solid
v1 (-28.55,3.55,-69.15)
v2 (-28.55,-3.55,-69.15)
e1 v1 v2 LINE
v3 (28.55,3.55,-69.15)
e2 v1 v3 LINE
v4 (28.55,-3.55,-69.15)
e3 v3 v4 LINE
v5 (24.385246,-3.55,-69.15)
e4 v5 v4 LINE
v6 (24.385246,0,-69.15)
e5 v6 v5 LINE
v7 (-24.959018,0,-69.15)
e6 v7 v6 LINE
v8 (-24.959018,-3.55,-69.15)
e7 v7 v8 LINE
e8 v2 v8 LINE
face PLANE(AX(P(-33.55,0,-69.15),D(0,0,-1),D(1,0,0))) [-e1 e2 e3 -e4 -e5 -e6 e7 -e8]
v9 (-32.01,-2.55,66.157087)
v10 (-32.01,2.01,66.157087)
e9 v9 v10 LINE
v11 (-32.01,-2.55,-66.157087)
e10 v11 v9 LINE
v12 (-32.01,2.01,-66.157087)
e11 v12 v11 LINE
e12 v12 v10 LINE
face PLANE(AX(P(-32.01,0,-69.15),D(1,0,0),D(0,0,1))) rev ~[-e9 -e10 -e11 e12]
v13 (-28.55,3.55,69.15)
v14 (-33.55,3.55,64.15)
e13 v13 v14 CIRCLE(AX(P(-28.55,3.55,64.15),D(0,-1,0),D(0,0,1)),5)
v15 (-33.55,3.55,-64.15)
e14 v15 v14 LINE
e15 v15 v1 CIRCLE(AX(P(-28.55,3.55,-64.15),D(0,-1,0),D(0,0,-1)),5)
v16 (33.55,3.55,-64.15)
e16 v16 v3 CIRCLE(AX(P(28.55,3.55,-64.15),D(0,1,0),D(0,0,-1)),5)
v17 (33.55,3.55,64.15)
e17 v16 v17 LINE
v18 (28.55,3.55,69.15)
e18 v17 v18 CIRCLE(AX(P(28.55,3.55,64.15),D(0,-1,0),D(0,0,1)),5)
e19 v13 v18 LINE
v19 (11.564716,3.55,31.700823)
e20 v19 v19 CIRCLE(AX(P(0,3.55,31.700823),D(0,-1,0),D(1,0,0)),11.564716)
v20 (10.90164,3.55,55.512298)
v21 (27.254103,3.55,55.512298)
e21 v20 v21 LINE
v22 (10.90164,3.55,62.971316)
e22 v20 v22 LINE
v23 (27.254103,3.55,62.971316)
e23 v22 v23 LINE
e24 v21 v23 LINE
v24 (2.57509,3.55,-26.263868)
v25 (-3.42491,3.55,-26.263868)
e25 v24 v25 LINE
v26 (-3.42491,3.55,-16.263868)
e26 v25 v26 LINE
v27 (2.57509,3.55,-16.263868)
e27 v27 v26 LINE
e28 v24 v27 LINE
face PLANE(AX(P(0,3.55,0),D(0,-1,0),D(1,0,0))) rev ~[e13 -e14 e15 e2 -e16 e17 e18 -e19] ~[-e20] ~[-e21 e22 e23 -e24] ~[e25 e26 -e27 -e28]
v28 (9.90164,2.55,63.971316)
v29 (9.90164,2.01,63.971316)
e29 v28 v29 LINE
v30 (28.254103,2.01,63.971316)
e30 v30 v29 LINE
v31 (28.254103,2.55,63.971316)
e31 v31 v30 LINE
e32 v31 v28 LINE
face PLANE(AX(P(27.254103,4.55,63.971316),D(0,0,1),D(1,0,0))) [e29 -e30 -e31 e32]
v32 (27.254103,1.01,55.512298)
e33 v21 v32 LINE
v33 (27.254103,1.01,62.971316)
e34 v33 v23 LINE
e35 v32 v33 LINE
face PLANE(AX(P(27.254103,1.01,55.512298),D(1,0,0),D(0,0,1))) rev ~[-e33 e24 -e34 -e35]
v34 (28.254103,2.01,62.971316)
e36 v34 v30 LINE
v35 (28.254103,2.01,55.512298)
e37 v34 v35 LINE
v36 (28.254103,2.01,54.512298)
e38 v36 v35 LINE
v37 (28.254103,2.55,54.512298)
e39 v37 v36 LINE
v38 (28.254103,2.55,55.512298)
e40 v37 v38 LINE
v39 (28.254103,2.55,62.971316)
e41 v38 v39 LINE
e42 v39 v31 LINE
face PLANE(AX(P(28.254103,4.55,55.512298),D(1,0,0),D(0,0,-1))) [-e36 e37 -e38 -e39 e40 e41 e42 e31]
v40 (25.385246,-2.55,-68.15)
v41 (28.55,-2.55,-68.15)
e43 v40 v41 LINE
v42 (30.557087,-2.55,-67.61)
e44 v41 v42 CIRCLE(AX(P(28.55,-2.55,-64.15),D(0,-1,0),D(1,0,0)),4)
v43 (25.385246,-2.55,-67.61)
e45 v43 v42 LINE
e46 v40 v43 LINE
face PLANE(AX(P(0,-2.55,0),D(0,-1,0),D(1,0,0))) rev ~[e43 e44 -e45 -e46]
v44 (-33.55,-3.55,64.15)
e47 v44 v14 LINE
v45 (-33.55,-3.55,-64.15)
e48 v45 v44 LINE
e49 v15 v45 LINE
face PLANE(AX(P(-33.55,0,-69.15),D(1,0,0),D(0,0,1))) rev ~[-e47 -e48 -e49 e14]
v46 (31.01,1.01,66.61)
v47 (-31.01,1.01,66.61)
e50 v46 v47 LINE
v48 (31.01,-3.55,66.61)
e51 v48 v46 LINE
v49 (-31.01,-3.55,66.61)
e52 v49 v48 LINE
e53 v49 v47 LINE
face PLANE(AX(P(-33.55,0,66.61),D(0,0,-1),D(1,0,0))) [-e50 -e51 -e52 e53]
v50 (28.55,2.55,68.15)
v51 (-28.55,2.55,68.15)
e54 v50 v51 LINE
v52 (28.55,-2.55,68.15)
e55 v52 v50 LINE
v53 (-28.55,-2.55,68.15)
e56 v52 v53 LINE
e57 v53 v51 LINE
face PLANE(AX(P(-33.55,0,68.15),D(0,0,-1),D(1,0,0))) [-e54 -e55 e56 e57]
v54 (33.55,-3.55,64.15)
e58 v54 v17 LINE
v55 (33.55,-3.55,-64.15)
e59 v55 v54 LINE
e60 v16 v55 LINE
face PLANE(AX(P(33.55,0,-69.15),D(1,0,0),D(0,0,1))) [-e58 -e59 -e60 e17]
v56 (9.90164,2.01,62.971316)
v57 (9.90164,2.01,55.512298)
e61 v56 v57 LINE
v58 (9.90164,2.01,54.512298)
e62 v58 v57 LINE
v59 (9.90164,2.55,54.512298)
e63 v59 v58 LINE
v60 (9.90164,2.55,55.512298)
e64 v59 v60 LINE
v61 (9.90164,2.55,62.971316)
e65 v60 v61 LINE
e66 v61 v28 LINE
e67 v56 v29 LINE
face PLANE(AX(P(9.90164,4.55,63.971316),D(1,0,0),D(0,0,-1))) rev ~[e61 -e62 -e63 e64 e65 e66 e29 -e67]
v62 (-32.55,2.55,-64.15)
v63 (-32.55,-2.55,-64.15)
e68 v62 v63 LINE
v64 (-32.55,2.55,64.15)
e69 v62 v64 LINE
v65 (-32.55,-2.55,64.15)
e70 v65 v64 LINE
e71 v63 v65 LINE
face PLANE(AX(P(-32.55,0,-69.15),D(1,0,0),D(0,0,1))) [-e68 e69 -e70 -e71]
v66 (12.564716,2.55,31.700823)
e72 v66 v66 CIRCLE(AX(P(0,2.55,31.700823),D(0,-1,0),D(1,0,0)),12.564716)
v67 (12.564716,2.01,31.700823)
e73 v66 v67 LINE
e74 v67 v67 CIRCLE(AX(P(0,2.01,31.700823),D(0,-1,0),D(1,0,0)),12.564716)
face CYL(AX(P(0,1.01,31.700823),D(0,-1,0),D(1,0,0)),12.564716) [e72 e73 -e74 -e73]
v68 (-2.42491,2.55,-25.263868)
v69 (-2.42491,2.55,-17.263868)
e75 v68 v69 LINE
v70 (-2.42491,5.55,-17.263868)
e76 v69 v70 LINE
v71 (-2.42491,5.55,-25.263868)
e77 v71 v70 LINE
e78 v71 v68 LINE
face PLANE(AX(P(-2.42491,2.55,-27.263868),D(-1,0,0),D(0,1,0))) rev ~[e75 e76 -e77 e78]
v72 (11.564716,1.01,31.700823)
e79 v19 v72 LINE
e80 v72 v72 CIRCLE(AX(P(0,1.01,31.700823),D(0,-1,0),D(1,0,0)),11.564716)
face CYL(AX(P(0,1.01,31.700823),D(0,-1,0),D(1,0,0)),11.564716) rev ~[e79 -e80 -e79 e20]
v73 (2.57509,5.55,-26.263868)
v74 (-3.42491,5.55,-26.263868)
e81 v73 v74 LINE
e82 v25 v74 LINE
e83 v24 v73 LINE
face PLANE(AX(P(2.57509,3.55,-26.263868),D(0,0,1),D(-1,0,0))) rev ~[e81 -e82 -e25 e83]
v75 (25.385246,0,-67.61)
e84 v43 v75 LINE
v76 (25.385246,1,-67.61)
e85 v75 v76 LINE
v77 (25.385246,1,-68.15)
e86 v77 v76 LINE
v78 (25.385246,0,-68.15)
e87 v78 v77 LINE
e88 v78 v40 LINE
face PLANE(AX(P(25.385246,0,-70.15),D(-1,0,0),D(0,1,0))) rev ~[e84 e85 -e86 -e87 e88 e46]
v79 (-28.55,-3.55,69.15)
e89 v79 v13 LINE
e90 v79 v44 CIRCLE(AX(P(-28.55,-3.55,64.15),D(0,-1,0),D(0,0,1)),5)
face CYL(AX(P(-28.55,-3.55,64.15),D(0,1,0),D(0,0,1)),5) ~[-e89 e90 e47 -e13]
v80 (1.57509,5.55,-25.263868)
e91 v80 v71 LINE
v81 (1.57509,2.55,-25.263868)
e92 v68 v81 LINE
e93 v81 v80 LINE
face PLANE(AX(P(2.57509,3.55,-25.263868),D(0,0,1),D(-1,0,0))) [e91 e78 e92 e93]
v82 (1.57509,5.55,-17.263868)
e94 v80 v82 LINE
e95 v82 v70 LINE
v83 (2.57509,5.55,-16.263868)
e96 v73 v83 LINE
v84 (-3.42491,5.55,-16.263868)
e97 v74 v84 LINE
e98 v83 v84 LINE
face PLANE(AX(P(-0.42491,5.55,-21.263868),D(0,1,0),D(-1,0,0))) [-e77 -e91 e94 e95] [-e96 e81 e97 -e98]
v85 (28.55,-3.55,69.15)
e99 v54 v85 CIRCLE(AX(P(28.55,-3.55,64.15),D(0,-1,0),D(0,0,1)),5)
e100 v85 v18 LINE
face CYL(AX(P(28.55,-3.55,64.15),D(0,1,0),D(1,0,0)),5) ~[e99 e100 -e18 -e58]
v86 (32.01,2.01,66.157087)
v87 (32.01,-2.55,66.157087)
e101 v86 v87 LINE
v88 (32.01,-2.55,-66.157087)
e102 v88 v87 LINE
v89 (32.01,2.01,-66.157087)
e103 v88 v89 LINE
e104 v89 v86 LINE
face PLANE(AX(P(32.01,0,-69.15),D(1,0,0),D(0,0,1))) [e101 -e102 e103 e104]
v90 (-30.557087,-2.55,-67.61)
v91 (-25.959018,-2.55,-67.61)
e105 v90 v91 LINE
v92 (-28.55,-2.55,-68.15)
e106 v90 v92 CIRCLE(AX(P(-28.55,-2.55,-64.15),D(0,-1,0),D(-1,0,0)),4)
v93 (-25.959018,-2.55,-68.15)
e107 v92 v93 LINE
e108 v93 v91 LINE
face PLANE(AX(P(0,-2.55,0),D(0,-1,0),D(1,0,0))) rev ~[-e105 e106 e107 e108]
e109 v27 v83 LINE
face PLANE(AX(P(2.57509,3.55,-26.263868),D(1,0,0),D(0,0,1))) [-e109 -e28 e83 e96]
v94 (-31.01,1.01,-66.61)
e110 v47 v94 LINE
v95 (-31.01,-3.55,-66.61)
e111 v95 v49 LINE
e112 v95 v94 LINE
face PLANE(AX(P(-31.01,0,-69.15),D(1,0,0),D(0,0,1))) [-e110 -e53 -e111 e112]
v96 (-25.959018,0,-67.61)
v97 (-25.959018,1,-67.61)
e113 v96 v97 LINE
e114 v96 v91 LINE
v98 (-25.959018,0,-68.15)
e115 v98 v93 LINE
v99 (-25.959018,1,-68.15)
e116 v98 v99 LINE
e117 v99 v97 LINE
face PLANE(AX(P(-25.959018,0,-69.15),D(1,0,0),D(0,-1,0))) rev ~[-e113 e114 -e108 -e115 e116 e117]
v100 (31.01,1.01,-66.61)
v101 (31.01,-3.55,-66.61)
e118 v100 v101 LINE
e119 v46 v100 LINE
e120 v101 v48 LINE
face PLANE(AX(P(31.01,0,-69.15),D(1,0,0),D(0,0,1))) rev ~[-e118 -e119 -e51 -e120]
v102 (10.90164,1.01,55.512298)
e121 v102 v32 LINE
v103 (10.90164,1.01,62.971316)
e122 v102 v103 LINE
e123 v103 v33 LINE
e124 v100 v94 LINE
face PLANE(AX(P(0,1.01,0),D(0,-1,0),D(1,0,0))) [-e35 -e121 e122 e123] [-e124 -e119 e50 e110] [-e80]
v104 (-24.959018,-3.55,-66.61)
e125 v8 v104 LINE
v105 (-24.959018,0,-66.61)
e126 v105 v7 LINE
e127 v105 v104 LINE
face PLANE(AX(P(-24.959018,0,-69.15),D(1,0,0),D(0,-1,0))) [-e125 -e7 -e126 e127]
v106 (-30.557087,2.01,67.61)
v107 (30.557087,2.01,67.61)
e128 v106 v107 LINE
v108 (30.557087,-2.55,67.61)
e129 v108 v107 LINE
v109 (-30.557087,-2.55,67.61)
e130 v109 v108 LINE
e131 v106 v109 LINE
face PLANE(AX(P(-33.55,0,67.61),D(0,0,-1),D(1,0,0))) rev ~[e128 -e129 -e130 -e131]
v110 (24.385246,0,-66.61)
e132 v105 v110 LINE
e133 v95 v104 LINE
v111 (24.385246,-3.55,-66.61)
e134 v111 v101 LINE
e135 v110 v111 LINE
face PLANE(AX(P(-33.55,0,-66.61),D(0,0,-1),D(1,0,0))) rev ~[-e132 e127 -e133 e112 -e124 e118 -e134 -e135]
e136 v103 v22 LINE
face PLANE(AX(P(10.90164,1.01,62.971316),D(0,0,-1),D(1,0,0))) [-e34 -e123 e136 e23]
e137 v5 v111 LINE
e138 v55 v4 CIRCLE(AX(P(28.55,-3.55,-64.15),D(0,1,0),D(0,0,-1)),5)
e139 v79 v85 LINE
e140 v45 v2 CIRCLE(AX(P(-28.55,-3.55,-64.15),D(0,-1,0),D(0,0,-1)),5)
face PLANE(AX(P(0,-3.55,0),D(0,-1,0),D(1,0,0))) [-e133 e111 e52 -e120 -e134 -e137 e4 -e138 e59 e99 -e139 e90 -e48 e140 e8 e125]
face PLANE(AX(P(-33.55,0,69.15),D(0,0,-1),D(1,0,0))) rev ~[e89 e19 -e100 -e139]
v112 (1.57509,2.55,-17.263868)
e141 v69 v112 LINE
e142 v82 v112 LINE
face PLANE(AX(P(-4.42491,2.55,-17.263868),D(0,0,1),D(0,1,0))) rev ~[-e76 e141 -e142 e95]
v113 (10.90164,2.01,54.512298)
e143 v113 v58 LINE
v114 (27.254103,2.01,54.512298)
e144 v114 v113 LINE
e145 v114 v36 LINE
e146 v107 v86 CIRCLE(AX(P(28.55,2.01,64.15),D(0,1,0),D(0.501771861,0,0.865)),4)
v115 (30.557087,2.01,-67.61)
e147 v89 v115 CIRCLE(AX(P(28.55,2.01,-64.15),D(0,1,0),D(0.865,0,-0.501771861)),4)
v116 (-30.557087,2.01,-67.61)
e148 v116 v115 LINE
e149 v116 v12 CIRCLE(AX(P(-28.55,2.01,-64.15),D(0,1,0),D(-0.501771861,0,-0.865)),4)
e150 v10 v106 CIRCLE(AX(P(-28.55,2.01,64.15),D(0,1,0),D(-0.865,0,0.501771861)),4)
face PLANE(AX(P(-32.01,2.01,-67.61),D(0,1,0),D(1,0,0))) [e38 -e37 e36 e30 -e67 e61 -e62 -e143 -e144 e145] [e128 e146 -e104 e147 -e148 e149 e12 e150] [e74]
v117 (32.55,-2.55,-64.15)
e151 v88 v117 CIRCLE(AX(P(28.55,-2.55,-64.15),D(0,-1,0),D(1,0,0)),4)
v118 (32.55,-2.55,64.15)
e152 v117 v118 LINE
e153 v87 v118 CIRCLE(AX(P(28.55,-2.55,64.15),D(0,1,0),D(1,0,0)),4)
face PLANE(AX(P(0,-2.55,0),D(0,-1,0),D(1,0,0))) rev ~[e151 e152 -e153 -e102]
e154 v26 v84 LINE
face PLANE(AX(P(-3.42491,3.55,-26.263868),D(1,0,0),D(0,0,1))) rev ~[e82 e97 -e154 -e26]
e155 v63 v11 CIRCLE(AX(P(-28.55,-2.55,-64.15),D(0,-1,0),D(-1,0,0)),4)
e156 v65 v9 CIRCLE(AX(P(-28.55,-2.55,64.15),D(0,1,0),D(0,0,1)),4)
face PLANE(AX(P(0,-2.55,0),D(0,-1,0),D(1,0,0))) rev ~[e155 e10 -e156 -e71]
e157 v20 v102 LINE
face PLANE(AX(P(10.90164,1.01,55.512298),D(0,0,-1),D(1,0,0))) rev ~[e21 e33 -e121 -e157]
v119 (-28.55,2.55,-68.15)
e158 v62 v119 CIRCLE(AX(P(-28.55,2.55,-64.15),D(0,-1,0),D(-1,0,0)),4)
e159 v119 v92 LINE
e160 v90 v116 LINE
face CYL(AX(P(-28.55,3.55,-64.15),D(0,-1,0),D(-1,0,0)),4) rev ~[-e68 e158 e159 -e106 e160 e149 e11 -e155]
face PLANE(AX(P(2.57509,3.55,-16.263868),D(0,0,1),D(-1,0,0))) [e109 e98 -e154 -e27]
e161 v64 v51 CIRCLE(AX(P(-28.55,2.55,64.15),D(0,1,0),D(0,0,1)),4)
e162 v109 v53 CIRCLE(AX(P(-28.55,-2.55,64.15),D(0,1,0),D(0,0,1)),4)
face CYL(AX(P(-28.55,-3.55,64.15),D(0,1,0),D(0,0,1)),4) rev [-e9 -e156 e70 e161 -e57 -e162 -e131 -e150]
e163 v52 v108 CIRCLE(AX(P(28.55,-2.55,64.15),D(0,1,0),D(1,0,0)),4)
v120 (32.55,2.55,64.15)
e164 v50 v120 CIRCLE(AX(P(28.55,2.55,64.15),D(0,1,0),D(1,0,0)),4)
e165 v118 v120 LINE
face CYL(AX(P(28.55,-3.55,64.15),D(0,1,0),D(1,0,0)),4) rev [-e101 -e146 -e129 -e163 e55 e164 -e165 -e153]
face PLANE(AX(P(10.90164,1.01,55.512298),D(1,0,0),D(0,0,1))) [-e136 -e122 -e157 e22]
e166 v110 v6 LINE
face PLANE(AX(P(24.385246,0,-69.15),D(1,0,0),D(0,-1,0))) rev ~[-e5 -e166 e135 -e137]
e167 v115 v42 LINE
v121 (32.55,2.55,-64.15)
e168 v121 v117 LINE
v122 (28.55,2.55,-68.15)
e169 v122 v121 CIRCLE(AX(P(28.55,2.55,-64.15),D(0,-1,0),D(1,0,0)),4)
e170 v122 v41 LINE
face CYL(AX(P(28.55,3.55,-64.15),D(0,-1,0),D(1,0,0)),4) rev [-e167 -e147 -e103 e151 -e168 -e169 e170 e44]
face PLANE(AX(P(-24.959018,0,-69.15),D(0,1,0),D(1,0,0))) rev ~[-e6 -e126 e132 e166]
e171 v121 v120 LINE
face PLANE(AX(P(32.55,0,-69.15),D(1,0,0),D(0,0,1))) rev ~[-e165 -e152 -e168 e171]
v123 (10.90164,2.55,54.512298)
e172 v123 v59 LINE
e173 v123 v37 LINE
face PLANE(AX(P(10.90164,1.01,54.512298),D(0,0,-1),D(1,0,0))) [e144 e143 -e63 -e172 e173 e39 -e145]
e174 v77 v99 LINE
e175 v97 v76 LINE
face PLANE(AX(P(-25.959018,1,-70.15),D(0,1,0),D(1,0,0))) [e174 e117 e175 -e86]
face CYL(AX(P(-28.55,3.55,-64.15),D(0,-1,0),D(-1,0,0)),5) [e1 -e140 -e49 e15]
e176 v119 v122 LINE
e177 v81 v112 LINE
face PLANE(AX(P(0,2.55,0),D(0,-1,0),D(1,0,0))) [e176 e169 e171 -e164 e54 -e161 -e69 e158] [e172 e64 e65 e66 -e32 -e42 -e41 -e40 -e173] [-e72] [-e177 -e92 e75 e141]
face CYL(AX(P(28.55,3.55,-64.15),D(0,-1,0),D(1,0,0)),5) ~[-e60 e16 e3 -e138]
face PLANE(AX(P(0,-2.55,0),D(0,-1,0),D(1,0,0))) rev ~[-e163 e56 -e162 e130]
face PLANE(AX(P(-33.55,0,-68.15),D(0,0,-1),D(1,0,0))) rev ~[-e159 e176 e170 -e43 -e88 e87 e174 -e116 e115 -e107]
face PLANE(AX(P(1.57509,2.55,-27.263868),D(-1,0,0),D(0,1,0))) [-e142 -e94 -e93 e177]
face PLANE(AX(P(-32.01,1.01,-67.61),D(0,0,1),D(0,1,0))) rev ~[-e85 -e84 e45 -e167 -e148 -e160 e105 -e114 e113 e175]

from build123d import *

# Parameters (mm, degrees)
F0_W          = 67.1
F0_H          = 138.3
F1_DEPTH      = 3.55
F2_T          = -2.54
F3_R          = 5
F4_W          = 16.3524625823
F4_H          = 7.4590183794
F5_DEPTH      = 12.5
F6_W          = 49.3442639709
F6_H          = 3.55
F7_DEPTH      = 12.5
F8_R          = 11.5647163982
F9_DEPTH      = 12.5
F10_W         = 6
F10_H         = 10
F11_DEPTH     = 2
F12_T         = 1
F12_T3_DEPTH  = 12
F12_T5_DEPTH  = 8
F12_T7_DEPTH  = 4.54
F12_T9_DEPTH  = 4.54
F12_T11_DEPTH = 6.56
F12_T13_DEPTH = 64.02
F12_T15_DEPTH = 135.22


# Not quite as in the source:
# - a shell that OpenCascade refuses in one call is made with other operations: the cavity is built on its own and cut out


with BuildPart() as f1:
    # F0 (on Front) → F1 (new body, symmetric)
    with BuildSketch(Plane.XZ):
        Rectangle(F0_W, F0_H)
    extrude(amount=F1_DEPTH, both=True)

    # F2
    f2_openings = [f1.faces().sort_by_distance(p)[0] for p in [
        (0, -3.55, 0),
    ]]
    offset(amount=F2_T, openings=f2_openings)

    # F3
    f3_edges = [f1.edges().sort_by_distance(p)[0] for p in [
        (-33.55, 0, 69.15),
        (-33.55, 0, -69.15),
        (33.55, 0, 69.15),
        (33.55, 0, -69.15),
    ]]
    fillet(f3_edges, radius=F3_R)

    # F4 (on face) → F5 (cut, symmetric)
    with BuildSketch(Plane.XZ.offset(-1.01)):
        with Locations((19.0778714605, 59.2418070883)):
            Rectangle(F4_W, F4_H)
    extrude(amount=F5_DEPTH, both=True, mode=Mode.SUBTRACT)

    # F6 (on face) → F7 (cut, symmetric)
    with BuildSketch(Plane(origin=(0, 0, -69.15), x_dir=(1, 0, 0), z_dir=(0, 0, -1))):
        with Locations((-0.2868864685, 1.775)):
            Rectangle(F6_W, F6_H)
    extrude(amount=F7_DEPTH, both=True, mode=Mode.SUBTRACT)

    # F8 (on face) → F9 (cut, symmetric)
    with BuildSketch(Plane.XZ.offset(-1.01)):
        with Locations((0, 31.700823456)):
            Circle(F8_R)
    extrude(amount=F9_DEPTH, both=True, mode=Mode.SUBTRACT)

    # F10 (on face) → F11 (join)
    with BuildSketch(Plane(origin=(0, 3.55, 0), x_dir=(-1, 0, 0), z_dir=(0, 1, 0))):
        with Locations((0.4249104531, -21.26386761)):
            Rectangle(F10_W, F10_H)
    extrude(amount=F11_DEPTH)

    # F12: shell of thickness 1, made by hand


with BuildPart() as f12_core1:
    # F12_t2: copy of F1
    add(f1.part)

    # the walls: a layer under each face that stays
    f12_faces = [f12_core1.faces().sort_by_distance(p)[0] for p in [
        (0, 0, 69.15),
        (0, 3.55, 0),
        (32.0855339059, 0, 67.6855339059),
        (-32.0855339059, 0, 67.6855339059),
        (-31.3133333333, -3.55, -64.54),
        (33.55, 0, 0),
        (-33.55, 0, 0),
        (32.0855339059, 0, -67.6855339059),
        (-32.0855339059, 0, -67.6855339059),
        (-19.0333333333, 2.3666666667, -69.15),
        (-3.4249104531, 4.55, -21.26386761),
        (-0.4249104531, 4.55, -26.26386761),
        (2.5750895469, 4.55, -21.26386761),
        (-0.4249104531, 4.55, -16.26386761),
        (-11.5647163982, 2.28, 31.700823456),
        (19.0778714605, 2.28, 62.971316278),
        (27.2541027516, 2.28, 59.2418070883),
        (10.9016401693, 2.28, 59.2418070883),
        (19.0778714605, 2.28, 55.5122978985),
        (24.3852455169, -1.775, -67.88),
        (-20.6733333333, 0.25, -66.61),
        (31.01, -1.27, 0),
        (0, -1.27, 66.61),
        (-31.01, -1.27, 0),
        (-24.959018454, -1.775, -67.88),
        (-0.2868864685, 0, -67.88),
        (0, 1.01, 0),
    ]]
    thicken(f12_faces, amount=-F12_T, mode=Mode.SUBTRACT)

    # F12_s4 → F12_t3 (cut)
    with BuildSketch(Plane.XY.offset(-27.26386761)):
        Polygon((-3.4349104531, 3.56), (-3.4249104531, 2.55), (-2.4249104531, 2.55), (-2.4249104531, 3.55), align=None)
        Polygon((2.5850895469, 3.56), (2.5750895469, 2.55), (1.5750895469, 2.55), (1.5750895469, 3.55), align=None)
    extrude(amount=F12_T3_DEPTH, mode=Mode.SUBTRACT)

    # F12_s6 → F12_t5 (cut)
    with BuildSketch(Plane.YZ.offset(-4.4249104531)):
        Polygon((3.56, -26.27386761), (2.55, -26.26386761), (2.55, -25.26386761), (3.55, -25.26386761), align=None)
        Polygon((3.56, -16.25386761), (2.55, -16.26386761), (2.55, -17.26386761), (3.55, -17.26386761), align=None)
    extrude(amount=F12_T5_DEPTH, mode=Mode.SUBTRACT)

    # F12_s8 → F12_t7 (cut)
    with BuildSketch(Plane.XZ.offset(-4.55)):
        Polygon((27.2441027516, 62.961316278), (27.2541027516, 63.971316278), (28.2541027516, 63.971316278), (28.2541027516, 62.971316278), align=None)
        Polygon((10.9116401693, 62.961316278), (10.9016401693, 63.971316278), (9.9016401693, 63.971316278), (9.9016401693, 62.971316278), align=None)
        Polygon((27.2441027516, 55.5222978985), (28.2541027516, 55.5122978985), (28.2541027516, 54.5122978985), (27.2541027516, 54.5122978985), align=None)
        Polygon((10.9116401693, 55.5222978985), (9.9016401693, 55.5122978985), (9.9016401693, 54.5122978985), (10.9016401693, 54.5122978985), align=None)
    extrude(amount=F12_T7_DEPTH, mode=Mode.SUBTRACT)

    # F12_s10 → F12_t9 (cut)
    with BuildSketch(Plane.XY.offset(-70.15)):
        Polygon((24.3752455169, -0.01), (25.3852455169, 0), (25.3852455169, 1), (24.3852455169, 1), align=None)
        Polygon((-24.949018454, -0.01), (-25.959018454, 0), (-25.959018454, 1), (-24.959018454, 1), align=None)
    extrude(amount=F12_T9_DEPTH, mode=Mode.SUBTRACT)

    # F12_s12 → F12_t11 (cut)
    with BuildSketch(Plane.XZ.offset(-2.01)):
        Polygon((31, -66.6), (31.01, -67.61), (32.01, -67.61), (32.01, -66.61), align=None)
        Polygon((-31, -66.6), (-31.01, -67.61), (-32.01, -67.61), (-32.01, -66.61), align=None)
        Polygon((31, 66.6), (32.01, 66.61), (32.01, 67.61), (31.01, 67.61), align=None)
        Polygon((-31, 66.6), (-31.01, 67.61), (-32.01, 67.61), (-32.01, 66.61), align=None)
    extrude(amount=F12_T11_DEPTH, mode=Mode.SUBTRACT)

    # F12_s14 → F12_t13 (cut)
    with BuildSketch(Plane.YZ.offset(-32.01)):
        Polygon((1, -66.6), (1.01, -67.61), (2.01, -67.61), (2.01, -66.61), align=None)
        Polygon((1, 66.6), (1.01, 67.61), (2.01, 67.61), (2.01, 66.61), align=None)
    extrude(amount=F12_T13_DEPTH, mode=Mode.SUBTRACT)

    # F12_s16 → F12_t15 (cut)
    with BuildSketch(Plane.XY.offset(-67.61)):
        Polygon((31, 1), (32.01, 1.01), (32.01, 2.01), (31.01, 2.01), align=None)
        Polygon((-31, 1), (-32.01, 1.01), (-32.01, 2.01), (-31.01, 2.01), align=None)
    extrude(amount=F12_T15_DEPTH, mode=Mode.SUBTRACT)


with BuildPart() as f1_1:
    add(f1.part)

    # what is left inside the walls is the cavity
    f12_cavity = [f12_core1.part.solids().sort_by_distance(p)[0] for p in [
        (-16.275, 2.54, 22.716667),
    ]]
    add(f12_cavity, mode=Mode.SUBTRACT)


solid = f1_1.part
